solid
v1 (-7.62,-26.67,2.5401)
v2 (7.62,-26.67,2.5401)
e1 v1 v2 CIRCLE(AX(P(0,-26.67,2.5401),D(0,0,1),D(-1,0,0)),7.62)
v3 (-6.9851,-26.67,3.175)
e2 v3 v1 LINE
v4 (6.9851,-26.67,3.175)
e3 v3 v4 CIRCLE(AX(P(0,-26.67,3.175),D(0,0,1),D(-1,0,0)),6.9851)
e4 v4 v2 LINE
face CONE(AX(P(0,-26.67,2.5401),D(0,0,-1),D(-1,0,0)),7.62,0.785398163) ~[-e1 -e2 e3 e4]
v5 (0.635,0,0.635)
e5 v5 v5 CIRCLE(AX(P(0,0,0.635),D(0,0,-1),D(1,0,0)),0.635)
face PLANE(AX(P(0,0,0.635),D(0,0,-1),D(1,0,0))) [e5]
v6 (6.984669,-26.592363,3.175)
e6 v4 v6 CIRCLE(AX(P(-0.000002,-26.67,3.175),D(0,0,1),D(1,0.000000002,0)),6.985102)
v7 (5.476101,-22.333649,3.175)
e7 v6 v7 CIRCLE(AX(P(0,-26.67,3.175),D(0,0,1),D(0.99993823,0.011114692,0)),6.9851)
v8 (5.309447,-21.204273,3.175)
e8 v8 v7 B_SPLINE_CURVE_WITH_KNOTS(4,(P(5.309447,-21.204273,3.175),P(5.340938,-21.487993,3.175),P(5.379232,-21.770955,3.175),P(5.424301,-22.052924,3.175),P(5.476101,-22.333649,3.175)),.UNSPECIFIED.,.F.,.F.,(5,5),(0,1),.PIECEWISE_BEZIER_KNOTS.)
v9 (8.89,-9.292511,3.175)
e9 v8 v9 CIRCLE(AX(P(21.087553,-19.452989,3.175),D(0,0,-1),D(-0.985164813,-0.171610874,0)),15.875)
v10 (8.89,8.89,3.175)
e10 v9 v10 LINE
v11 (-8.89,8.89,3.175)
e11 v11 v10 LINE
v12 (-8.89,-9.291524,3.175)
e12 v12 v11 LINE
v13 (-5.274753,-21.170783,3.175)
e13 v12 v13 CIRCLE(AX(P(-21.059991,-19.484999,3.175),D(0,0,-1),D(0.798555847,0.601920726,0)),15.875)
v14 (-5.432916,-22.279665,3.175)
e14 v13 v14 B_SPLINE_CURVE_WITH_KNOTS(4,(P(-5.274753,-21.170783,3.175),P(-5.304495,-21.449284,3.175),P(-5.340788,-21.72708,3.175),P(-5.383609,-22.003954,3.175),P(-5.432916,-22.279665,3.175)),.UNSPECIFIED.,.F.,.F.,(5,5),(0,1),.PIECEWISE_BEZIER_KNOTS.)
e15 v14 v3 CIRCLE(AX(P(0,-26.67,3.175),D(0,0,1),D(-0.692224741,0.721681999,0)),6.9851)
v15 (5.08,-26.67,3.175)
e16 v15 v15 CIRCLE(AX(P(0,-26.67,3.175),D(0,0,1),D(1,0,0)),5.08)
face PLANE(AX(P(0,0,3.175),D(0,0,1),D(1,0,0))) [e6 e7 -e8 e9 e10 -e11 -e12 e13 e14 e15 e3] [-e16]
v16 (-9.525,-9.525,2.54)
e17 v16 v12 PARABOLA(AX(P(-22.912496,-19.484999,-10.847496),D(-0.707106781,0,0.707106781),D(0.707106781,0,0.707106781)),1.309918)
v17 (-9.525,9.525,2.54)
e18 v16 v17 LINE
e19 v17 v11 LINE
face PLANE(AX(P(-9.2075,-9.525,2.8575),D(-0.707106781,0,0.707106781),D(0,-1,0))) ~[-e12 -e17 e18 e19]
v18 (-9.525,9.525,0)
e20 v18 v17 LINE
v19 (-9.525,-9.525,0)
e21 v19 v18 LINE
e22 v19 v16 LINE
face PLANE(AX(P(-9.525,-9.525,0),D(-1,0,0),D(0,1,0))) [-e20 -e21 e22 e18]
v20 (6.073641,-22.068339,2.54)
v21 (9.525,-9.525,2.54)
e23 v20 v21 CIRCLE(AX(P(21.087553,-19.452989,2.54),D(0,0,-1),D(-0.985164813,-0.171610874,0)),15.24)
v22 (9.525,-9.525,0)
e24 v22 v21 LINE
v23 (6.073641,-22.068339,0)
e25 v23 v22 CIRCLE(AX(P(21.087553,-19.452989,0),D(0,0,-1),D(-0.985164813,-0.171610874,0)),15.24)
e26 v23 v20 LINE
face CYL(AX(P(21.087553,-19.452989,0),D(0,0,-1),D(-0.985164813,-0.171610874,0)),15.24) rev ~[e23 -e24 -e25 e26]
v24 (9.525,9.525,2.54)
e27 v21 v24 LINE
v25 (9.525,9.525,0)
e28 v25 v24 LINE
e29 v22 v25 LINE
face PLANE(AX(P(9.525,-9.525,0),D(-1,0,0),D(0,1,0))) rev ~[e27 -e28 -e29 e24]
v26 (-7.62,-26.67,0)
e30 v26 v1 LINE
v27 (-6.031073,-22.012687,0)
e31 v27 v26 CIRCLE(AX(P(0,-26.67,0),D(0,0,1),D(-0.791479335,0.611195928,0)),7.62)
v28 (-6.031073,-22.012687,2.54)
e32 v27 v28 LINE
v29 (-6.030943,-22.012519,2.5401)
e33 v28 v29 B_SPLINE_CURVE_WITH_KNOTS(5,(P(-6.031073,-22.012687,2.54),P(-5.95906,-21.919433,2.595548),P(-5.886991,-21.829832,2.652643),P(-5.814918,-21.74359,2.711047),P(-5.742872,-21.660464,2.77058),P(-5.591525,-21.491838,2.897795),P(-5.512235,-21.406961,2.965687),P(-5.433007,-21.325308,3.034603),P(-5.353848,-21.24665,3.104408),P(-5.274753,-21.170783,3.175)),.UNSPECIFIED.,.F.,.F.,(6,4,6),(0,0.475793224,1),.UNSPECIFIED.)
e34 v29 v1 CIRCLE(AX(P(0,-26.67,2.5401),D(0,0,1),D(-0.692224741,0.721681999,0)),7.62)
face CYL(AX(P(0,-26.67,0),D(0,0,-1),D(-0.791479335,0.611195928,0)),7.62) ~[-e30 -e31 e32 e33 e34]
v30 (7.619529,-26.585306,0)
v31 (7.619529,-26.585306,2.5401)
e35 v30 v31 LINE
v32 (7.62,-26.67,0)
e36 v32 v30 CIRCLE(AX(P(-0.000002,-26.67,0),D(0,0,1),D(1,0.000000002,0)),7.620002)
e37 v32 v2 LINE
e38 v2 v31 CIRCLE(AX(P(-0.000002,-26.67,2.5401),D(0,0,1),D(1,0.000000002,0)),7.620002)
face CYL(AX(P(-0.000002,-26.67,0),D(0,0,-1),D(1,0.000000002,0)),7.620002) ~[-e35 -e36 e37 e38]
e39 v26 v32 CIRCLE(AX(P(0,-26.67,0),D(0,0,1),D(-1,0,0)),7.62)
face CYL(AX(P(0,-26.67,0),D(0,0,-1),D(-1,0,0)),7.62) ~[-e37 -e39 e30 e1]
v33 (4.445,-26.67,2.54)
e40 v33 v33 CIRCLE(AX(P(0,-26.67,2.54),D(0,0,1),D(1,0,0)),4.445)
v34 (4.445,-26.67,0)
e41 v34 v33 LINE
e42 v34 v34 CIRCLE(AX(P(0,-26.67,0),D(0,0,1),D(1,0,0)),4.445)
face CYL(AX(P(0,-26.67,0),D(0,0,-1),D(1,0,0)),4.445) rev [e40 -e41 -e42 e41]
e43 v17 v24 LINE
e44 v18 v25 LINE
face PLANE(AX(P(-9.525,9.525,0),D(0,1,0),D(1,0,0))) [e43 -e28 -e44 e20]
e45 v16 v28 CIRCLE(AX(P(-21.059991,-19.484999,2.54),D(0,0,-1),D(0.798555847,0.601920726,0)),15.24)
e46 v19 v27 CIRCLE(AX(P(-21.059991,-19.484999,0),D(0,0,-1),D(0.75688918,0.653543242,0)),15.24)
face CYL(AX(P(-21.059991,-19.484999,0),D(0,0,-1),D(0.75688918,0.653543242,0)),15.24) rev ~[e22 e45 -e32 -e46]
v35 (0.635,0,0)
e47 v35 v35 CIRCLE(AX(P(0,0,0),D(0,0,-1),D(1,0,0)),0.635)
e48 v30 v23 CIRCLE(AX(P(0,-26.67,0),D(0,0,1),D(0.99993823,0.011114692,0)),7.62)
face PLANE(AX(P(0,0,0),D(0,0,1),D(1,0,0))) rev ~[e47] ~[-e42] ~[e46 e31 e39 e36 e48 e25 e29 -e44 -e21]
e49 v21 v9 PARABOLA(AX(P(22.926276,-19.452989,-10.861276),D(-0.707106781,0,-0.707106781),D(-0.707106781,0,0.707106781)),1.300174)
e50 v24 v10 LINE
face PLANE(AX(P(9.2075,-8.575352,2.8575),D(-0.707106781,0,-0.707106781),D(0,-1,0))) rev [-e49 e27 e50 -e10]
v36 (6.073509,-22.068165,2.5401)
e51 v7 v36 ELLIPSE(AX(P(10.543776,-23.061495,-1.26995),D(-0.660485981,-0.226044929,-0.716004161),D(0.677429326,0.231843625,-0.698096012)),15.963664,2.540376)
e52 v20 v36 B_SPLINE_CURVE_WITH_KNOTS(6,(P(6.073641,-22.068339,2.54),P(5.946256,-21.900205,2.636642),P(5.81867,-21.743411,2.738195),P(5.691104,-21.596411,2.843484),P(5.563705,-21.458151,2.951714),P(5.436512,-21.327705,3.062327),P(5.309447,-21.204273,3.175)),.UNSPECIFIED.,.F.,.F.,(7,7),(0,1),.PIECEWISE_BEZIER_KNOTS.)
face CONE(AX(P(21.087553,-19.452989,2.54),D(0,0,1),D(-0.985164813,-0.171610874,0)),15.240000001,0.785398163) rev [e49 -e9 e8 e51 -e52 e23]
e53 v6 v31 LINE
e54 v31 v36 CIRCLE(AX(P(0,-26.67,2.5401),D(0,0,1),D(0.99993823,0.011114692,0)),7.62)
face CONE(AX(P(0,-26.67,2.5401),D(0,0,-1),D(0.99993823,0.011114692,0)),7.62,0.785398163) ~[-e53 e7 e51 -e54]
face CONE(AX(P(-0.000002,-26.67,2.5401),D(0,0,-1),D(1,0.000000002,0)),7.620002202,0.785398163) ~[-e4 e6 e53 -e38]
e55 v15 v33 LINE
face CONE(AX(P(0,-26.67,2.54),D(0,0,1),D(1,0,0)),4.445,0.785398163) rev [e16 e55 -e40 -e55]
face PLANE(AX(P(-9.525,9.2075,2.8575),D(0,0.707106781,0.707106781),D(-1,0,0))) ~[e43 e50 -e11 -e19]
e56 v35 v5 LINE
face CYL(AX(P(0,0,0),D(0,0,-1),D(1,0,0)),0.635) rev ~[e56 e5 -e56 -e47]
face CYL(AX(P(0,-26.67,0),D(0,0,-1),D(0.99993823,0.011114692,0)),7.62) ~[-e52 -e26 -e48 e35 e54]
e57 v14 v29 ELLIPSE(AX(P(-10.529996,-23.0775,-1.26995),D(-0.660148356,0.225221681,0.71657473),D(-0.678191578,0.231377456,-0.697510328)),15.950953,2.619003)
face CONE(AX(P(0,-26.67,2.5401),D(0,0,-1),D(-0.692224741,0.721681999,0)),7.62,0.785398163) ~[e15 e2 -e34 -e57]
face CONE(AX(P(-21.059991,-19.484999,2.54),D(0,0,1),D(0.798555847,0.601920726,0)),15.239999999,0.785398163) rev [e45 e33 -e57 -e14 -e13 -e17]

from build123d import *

# Parameters (mm, degrees)
F0_W       = 19.05
F0_H       = 19.05
F0_R       = 4.445
F1_DEPTH   = 3.175
F2_C1_SIZE = 0.635
F2_C2_SIZE = 0.635
F2_C3_SIZE = 0.635
F2_C4_SIZE = 0.635
F2_C5_SIZE = 0.635
F2_C6_SIZE = 0.635
F2_C7_SIZE = 0.6349
F3_R       = 0.635
F4_DEPTH   = 0.635


# Not quite as in the source:
# - a fillet or chamfer is up to 0.001 mm smaller than in the source, because OpenCascade refuses the exact size


with BuildPart() as f1:
    # F0 (on Top) → F1 (new body)
    with BuildSketch(Plane.XY):
        Rectangle(F0_W, F0_H)
        with BuildLine():
            Line((9.525, -9.525), (-9.525, -9.525))
            ThreePointArc((-9.525, -9.525), (-6.3836187271, -15.3786997104), (-6.0310725347, -22.012687032))
            ThreePointArc((-6.0310725347, -22.012687032), (0.0350329382, -19.0500805324), (6.0736411029, -22.0683390224))
            ThreePointArc((6.0736411029, -22.0683390224), (6.3936440411, -15.409890989), (9.525, -9.525))
        make_face()
        with BuildLine():
            ThreePointArc((6.0736411029, -22.0683390224), (0.0350329382, -19.0500805324), (-6.0310725347, -22.012687032))
            ThreePointArc((-6.0310725347, -22.012687032), (-6.6363180101, -24.4058987838), (-7.62, -26.67))
            ThreePointArc((-7.62, -26.67), (0, -34.29), (7.62, -26.67))
            ThreePointArc((7.62, -26.67), (7.619882327, -26.6276523681), (7.6195293118, -26.5853060441))
            ThreePointArc((7.6195293118, -26.5853060441), (6.6686101992, -24.3877327559), (6.0736411029, -22.0683390224))
        make_face()
        with Locations((0, -26.67)):
            Circle(F0_R, mode=Mode.SUBTRACT)
        with BuildLine():
            ThreePointArc((-7.62, -26.67), (-6.6363180101, -24.4058987838), (-6.0310725347, -22.012687032))
            ThreePointArc((-6.0310725347, -22.012687032), (-7.2118365454, -24.2095501137), (-7.62, -26.67))
        make_face()
        with BuildLine():
            ThreePointArc((7.6195293118, -26.5853060441), (7.2094713239, -24.202628275), (6.0736411029, -22.0683390224))
            ThreePointArc((6.0736411029, -22.0683390224), (6.6686101992, -24.3877327559), (7.6195293118, -26.5853060441))
        make_face()
    extrude(amount=F1_DEPTH)

    # F2: chamfer of 0.635 on 7 edges, made by hand

    # F2_c1
    f2_c1_edges = [f1.edges().sort_by_distance(p)[0] for p in [
        (0, 9.525, 3.175),
    ]]
    chamfer(f2_c1_edges, length=F2_C1_SIZE)

    # F2_c2
    f2_c2_edges = [f1.edges().sort_by_distance(p)[0] for p in [
        (-9.525, -0.3175, 3.175),
    ]]
    chamfer(f2_c2_edges, length=F2_C2_SIZE)

    # F2_c3
    f2_c3_edges = [f1.edges().sort_by_distance(p)[0] for p in [
        (-6.2554888364, -15.867774564, 3.175),
    ]]
    chamfer(f2_c3_edges, length=F2_C3_SIZE)

    # F2_c4
    f2_c4_edges = [f1.edges().sort_by_distance(p)[0] for p in [
        (6.3936440411, -15.409890989, 3.175),
    ]]
    chamfer(f2_c4_edges, length=F2_C4_SIZE)

    # F2_c5
    f2_c5_edges = [f1.edges().sort_by_distance(p)[0] for p in [
        (9.525, 0.1573240758, 3.175),
    ]]
    chamfer(f2_c5_edges, length=F2_C5_SIZE)

    # F2_c6
    f2_c6_edges = [f1.edges().sort_by_distance(p)[0] for p in [
        (-4.445, -26.67, 3.175),
    ]]
    chamfer(f2_c6_edges, length=F2_C6_SIZE)

    # F2_c7 (size 0.635 in the source; OpenCascade refuses exactly that, so slightly less here)
    f2_c7_edges = [f1.edges().sort_by_distance(p)[0] for p in [
        (-0.0350329382, -34.2899194676, 3.175),
    ]]
    chamfer(f2_c7_edges, length=F2_C7_SIZE)

    # F3 (on face) → F4 (cut)
    with BuildSketch(Plane(origin=(0, 0, 0), x_dir=(1, 0, 0), z_dir=(0, 0, -1))):
        Circle(F3_R)
    extrude(amount=-F4_DEPTH, mode=Mode.SUBTRACT)


solid = f1.part
